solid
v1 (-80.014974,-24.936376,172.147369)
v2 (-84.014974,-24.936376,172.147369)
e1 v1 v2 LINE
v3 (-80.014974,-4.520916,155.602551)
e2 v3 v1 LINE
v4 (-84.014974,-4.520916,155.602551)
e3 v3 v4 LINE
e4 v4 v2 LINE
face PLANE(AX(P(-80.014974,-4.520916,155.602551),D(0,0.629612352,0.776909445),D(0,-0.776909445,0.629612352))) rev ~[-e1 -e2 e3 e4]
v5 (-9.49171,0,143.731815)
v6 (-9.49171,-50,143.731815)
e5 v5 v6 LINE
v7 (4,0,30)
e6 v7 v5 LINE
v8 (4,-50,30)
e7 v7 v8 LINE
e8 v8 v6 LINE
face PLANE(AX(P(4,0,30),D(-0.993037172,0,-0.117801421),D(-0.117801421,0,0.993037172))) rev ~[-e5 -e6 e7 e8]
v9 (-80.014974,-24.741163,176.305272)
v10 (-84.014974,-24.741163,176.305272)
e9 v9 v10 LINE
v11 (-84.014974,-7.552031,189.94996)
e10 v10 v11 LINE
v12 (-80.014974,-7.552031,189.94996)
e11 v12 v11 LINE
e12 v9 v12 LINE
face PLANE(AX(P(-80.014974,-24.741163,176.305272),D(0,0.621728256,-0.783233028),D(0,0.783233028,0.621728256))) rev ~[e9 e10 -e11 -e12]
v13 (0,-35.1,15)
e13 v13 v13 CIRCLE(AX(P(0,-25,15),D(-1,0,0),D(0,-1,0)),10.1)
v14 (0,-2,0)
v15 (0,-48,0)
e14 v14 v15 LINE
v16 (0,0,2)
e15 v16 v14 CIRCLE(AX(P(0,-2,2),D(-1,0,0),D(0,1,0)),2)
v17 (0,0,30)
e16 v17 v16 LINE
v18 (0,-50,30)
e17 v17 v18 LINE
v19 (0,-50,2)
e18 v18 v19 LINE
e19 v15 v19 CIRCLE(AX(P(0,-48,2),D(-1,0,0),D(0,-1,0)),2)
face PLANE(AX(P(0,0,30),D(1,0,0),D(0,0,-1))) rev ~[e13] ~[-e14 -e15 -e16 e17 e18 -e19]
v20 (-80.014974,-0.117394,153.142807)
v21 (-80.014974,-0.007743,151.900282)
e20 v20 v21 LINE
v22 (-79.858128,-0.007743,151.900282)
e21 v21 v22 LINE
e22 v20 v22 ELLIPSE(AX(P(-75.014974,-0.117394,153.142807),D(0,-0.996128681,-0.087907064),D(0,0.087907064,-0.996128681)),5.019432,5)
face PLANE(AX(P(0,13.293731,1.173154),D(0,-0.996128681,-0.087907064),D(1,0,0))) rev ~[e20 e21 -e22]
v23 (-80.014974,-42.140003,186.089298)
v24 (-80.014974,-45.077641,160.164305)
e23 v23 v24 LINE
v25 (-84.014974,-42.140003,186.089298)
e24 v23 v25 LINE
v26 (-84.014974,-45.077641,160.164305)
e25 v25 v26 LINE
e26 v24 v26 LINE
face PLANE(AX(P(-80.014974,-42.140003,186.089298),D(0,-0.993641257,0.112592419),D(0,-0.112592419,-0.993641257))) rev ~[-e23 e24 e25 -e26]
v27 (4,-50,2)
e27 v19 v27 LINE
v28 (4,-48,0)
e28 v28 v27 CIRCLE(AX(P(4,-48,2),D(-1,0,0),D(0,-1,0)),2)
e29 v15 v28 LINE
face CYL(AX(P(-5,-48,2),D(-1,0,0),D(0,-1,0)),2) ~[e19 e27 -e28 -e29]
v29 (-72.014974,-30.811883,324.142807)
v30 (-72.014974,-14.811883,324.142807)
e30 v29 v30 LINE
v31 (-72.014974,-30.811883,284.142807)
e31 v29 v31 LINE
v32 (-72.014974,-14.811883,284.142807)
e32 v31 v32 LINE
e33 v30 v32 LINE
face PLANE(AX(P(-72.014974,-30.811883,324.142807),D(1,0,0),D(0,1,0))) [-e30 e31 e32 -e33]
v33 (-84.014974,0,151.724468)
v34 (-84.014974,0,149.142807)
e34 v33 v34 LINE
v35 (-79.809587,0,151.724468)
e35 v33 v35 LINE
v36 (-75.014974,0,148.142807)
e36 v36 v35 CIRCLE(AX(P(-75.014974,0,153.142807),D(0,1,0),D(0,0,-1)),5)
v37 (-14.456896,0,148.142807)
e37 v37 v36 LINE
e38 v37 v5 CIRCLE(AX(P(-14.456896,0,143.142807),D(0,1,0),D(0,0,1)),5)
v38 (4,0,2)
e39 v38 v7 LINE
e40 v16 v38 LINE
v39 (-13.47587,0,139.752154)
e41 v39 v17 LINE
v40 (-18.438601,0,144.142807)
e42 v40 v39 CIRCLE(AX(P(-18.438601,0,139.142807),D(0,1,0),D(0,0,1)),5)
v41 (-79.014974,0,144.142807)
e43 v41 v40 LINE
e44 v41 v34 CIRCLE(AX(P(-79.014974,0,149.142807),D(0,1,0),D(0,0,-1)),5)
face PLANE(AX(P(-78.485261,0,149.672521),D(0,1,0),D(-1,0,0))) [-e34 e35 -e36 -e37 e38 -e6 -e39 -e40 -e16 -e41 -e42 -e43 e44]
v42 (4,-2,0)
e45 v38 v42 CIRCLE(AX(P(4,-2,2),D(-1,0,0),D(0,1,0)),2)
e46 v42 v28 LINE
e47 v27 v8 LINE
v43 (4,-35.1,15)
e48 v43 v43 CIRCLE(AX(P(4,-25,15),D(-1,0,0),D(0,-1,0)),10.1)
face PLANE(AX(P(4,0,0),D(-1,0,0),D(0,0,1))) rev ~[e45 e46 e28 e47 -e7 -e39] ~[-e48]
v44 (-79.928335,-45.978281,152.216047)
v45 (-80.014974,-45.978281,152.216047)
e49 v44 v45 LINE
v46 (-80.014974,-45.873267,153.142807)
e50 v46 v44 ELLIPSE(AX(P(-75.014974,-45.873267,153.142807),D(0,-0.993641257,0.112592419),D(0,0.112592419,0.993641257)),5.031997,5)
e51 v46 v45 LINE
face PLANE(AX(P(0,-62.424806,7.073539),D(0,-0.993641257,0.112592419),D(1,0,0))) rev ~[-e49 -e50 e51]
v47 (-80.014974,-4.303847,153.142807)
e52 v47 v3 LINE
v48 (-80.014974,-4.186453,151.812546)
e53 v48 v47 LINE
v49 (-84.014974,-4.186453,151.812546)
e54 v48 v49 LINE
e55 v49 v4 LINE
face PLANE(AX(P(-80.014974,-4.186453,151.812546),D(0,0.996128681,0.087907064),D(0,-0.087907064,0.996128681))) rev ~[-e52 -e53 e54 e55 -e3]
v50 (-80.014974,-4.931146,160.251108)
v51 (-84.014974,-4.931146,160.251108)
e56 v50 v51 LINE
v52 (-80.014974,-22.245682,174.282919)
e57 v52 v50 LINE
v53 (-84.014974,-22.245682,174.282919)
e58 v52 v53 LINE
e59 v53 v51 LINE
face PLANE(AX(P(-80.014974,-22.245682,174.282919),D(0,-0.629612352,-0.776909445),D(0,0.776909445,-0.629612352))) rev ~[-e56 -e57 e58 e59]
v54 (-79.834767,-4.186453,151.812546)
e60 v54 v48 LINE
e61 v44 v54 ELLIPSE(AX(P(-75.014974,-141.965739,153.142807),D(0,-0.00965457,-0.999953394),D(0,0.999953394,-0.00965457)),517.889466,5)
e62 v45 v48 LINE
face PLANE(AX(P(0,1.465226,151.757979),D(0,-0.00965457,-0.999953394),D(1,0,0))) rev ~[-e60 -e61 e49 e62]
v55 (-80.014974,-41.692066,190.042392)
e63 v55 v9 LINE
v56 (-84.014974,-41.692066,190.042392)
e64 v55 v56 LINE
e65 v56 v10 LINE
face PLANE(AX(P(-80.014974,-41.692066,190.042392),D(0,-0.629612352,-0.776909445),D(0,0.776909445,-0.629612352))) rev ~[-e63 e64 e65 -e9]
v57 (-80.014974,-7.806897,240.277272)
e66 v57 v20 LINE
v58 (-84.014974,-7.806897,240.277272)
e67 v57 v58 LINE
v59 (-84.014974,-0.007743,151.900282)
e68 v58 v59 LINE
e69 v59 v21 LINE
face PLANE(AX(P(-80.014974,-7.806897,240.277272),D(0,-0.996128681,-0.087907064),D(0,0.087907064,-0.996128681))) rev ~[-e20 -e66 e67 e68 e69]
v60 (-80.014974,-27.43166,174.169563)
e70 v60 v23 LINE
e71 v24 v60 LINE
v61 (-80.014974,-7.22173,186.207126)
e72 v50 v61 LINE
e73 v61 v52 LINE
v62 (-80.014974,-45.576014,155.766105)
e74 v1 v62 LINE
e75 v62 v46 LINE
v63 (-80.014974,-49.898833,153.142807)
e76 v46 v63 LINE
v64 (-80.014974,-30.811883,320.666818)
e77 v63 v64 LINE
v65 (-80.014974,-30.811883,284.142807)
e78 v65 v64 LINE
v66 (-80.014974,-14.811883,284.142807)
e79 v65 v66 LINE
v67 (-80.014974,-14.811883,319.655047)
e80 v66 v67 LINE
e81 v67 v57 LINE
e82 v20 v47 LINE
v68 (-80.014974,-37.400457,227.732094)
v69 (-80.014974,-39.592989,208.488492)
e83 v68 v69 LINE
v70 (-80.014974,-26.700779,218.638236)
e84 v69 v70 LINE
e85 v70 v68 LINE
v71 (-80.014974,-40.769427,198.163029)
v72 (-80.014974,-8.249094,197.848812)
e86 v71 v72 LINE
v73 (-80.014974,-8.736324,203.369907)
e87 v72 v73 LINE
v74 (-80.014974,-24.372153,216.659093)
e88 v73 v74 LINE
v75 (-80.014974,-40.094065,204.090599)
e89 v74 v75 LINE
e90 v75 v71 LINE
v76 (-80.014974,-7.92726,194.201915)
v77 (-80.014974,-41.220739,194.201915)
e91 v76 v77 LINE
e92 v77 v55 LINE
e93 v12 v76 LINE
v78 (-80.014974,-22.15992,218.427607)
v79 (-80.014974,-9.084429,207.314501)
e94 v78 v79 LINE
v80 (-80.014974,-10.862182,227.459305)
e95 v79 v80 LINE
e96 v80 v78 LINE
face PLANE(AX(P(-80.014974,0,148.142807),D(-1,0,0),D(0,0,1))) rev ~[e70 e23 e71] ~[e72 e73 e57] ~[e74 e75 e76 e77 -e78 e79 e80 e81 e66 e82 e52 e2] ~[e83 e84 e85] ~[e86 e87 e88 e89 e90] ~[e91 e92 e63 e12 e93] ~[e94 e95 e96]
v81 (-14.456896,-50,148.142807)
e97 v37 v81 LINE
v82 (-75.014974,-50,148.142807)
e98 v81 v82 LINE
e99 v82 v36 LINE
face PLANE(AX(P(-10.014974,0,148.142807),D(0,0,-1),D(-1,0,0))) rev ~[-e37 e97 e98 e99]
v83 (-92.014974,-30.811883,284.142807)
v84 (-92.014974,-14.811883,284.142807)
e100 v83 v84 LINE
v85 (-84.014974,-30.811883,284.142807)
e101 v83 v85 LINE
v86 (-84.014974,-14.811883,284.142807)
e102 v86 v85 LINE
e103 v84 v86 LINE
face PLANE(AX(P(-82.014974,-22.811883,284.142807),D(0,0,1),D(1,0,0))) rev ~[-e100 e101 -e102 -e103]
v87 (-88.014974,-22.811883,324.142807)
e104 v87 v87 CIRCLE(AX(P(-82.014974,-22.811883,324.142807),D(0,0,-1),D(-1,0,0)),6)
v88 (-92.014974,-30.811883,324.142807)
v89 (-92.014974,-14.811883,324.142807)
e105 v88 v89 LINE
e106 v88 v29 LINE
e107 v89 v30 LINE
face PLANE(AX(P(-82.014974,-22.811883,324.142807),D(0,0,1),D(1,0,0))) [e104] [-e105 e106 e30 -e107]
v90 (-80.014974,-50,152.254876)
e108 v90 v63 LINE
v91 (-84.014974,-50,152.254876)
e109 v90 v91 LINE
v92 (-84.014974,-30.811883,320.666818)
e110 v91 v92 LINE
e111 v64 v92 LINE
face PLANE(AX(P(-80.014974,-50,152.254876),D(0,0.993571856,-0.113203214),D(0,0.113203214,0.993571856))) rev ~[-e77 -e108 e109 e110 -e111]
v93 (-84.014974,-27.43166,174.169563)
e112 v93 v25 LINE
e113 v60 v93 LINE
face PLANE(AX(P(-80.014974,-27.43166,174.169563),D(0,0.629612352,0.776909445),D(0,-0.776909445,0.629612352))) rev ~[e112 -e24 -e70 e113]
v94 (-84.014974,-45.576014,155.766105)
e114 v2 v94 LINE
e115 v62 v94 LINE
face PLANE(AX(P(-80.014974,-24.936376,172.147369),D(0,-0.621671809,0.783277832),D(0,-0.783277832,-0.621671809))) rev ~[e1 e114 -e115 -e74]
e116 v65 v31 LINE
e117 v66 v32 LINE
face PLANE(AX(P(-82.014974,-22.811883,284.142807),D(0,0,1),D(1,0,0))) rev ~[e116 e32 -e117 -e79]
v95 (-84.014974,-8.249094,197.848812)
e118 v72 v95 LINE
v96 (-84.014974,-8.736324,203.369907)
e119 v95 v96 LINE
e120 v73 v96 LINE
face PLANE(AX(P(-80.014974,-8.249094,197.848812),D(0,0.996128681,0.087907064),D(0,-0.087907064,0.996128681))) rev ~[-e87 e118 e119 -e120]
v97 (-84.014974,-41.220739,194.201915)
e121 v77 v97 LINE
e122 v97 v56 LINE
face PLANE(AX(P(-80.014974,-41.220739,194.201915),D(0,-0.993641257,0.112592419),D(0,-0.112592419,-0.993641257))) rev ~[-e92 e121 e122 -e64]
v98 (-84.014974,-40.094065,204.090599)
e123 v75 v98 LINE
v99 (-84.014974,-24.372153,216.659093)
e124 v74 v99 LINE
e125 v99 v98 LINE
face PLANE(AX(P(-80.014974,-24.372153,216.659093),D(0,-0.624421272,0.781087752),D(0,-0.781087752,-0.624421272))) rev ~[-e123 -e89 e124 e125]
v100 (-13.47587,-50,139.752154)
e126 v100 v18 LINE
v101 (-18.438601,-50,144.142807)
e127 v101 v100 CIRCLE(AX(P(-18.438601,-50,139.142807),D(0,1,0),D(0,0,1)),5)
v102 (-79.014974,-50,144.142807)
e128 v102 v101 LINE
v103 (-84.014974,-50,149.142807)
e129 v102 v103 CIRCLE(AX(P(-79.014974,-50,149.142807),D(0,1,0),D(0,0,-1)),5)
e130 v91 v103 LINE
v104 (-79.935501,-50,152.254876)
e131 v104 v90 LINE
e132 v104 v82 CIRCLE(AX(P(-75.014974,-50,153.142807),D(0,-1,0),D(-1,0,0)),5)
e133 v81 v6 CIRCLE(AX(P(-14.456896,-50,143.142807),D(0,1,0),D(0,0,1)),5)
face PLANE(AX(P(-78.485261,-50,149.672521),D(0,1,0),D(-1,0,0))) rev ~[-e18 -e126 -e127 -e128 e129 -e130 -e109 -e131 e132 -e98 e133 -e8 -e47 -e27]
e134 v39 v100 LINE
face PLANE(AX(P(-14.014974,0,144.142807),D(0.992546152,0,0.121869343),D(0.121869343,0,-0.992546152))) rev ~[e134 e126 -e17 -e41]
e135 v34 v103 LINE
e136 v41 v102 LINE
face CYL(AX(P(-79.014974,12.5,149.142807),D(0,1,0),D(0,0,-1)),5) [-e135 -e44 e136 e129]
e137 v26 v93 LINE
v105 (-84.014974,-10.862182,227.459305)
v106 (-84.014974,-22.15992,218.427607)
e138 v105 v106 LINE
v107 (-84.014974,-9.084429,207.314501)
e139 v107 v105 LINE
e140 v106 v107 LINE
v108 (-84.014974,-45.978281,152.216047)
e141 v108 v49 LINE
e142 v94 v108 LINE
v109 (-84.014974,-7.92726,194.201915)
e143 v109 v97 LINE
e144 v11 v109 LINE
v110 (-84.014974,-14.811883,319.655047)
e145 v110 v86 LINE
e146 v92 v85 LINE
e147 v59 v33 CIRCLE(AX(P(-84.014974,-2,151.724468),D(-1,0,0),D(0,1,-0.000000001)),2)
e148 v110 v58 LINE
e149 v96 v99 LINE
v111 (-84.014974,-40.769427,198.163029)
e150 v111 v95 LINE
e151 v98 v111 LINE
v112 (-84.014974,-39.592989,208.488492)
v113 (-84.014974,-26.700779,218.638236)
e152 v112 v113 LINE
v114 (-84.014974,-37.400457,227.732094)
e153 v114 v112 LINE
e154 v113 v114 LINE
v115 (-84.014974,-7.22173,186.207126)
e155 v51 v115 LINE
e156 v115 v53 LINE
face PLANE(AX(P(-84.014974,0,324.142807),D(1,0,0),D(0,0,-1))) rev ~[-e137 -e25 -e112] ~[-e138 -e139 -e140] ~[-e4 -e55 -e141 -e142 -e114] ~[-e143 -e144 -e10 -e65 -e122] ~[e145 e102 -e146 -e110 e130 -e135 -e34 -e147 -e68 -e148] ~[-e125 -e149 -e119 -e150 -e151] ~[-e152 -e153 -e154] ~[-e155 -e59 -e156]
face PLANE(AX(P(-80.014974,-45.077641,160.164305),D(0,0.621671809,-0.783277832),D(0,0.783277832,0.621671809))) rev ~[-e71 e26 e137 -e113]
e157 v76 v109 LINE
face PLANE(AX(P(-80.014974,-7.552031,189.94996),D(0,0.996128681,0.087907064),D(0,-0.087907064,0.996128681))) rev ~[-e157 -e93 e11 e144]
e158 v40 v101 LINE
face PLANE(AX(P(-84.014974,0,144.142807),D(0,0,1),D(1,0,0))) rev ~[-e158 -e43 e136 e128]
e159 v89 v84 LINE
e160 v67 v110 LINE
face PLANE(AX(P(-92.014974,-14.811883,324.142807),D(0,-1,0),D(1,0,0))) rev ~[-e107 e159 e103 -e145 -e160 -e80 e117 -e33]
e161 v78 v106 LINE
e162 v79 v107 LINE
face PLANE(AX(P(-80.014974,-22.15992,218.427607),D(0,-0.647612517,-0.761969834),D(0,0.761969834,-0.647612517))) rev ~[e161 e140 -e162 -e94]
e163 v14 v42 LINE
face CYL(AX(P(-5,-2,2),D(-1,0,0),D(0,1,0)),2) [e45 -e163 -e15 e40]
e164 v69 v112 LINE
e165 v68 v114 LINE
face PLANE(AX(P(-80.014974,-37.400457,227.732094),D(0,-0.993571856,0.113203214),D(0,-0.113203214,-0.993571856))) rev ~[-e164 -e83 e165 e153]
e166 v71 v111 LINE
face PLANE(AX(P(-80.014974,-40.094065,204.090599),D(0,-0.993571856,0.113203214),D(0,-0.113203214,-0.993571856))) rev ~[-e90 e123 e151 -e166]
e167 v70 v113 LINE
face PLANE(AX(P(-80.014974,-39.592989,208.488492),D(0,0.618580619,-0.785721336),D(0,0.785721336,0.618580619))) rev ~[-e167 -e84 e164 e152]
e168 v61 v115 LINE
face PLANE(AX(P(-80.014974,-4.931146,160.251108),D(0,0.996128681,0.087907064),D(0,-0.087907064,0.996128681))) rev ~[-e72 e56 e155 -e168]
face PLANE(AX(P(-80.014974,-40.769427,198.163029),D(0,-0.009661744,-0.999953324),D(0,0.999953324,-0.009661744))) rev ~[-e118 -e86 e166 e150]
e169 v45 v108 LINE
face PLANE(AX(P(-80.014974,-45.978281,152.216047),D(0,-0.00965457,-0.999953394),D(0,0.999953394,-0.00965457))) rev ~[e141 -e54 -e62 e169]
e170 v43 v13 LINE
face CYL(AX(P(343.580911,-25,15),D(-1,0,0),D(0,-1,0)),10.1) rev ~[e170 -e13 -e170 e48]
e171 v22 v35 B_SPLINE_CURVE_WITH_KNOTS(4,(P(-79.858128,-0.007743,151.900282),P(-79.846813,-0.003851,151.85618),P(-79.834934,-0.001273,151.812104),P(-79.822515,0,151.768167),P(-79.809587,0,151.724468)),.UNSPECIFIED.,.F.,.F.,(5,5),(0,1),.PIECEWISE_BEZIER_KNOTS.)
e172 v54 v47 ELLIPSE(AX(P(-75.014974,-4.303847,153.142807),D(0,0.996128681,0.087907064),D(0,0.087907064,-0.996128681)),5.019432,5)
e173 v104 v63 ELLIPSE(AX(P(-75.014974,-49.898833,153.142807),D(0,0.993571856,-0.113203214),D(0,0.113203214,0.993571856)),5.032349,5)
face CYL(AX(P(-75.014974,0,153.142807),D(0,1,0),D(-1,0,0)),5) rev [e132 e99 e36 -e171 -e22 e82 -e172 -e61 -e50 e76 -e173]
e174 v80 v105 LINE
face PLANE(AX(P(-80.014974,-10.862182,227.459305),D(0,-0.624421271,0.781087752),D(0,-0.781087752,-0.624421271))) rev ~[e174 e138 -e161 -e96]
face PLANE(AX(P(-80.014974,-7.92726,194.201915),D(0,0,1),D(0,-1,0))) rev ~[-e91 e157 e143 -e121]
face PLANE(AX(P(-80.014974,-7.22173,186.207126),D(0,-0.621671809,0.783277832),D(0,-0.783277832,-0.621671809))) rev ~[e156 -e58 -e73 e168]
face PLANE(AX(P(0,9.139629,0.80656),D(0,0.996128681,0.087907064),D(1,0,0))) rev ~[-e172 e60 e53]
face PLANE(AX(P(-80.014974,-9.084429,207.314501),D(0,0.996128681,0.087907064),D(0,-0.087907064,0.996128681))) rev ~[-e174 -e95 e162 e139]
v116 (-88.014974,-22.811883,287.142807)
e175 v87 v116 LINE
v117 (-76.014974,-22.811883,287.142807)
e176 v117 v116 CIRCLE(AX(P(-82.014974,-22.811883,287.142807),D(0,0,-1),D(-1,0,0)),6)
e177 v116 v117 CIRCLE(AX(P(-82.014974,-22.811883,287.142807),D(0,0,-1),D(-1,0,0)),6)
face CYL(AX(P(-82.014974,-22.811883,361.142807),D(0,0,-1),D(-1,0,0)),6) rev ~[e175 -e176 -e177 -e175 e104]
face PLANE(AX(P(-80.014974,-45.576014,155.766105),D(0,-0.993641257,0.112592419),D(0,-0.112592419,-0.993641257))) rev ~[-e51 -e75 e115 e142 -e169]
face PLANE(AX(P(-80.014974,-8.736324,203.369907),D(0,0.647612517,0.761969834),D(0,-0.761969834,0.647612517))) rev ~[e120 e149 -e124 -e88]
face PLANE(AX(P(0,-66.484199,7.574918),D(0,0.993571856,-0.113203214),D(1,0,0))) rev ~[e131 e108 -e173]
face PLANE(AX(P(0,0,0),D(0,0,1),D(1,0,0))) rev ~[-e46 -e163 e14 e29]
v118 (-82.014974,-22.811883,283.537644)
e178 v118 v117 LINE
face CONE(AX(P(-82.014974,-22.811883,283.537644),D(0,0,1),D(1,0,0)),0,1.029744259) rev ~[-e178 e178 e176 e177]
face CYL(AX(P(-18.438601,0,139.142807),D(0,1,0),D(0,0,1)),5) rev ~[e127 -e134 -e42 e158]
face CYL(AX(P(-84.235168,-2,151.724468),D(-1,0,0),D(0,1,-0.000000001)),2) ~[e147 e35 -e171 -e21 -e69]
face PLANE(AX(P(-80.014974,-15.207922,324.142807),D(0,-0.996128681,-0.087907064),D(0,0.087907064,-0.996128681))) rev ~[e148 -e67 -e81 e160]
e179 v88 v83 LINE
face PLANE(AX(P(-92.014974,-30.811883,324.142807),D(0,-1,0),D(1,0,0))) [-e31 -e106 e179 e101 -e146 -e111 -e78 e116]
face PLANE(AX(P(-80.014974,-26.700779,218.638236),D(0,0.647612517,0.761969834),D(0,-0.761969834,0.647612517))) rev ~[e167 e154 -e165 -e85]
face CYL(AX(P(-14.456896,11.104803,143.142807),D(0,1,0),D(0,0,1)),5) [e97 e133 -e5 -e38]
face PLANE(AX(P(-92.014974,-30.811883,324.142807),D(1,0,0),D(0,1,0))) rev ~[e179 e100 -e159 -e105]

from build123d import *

# Parameters (mm, degrees)
F1_DEPTH     = 50
F3_D         = 20.2
F5_DEPTH     = 25
F6_T1_DEPTH  = 50
F6_T6_DEPTH  = 50
F6_T13_DEPTH = 50
F6_T19_DEPTH = 50
F6_T26_DEPTH = 50
F6_T33_DEPTH = 50
F6_T36_DEPTH = 72.2096061325
F6_T38_DEPTH = 75
F7_T1_DEPTH  = 4.6205948456
F7_T3_DEPTH  = 14
F8_W         = 20
F8_H         = 16
F8_W_2       = 4
F8_H_2       = 15.2079220091
F9_DEPTH     = 40
F10_D        = 12
F10_DEPTH    = 37
F10_TIP      = 3.6051637142


# Not quite as in the source:
# - a fillet or chamfer that OpenCascade refuses, or shapes differently, is made with other operations: its cross-section is extruded or revolved along the edge and cut away or added
# - a feature names something its author has since deleted; it is built from what else it names


with BuildPart() as f1:
    # F0 (on Front) → F1 (new body)
    with BuildSketch(Plane.XZ):
        Polygon((0, 30), (0, 0), (4, 0), (4, 30), (-10.0149744916, 148.1428074388), (-14.0149744916, 148.1428074388), (-80.0149744916, 148.1428074388), (-80.0149744916, 324.1428074388), (-84.0149744916, 324.1428074388), (-84.0149744916, 144.1428074388), (-14.0149744916, 144.1428074388), align=None)
    extrude(amount=F1_DEPTH)

    # F3 (through all)
    with Locations(Plane.YZ.offset(4)):
        with Locations((-25, 15)):
            Hole(F3_D / 2)

    # F4 (on face) → F5 (cut)
    with BuildSketch(Plane.YZ.offset(-80.0149744916)):
        Polygon((-50, 324.1428074388), (-50, 236.1428074388), (-50, 199.9447409799), (-50, 195.9447409799), (-50, 194.2019151126), (-50, 156.2548764067), (-50, 152.2548764067), (-39.9857666554, 240.1486744376), (-30.4158440182, 324.1428074388), align=None)
        Polygon((0, 324.1428074388), (-15.2079220091, 324.1428074388), (-7.806897337, 240.2772722232), (0, 151.8125457081), (0, 244.1428074388), align=None)
        Polygon((-45.5760135212, 155.7661052017), (-45.9782811199, 152.2160466314), (-4.1864533227, 151.8125457081), (-4.5209163536, 155.6025507861), (-24.936375975, 172.1473690272), align=None)
        Polygon((-9.0844288508, 207.3145008204), (-10.8621816933, 227.4593051175), (-22.1599204596, 218.427607474), align=None)
        Polygon((-42.1400031958, 186.0892978758), (-45.0776405527, 160.1643048917), (-27.431660318, 174.1695633191), align=None)
        Polygon((-39.5929888388, 208.4884916623), (-26.7007793174, 218.6382363502), (-37.4004572752, 227.7320942228), align=None)
        Polygon((-22.2456820263, 174.2829185178), (-4.9311455022, 160.2511080648), (-7.2217303873, 186.2071257598), align=None)
        Polygon((-8.7363235607, 203.3699069618), (-24.3721529686, 216.6590929463), (-40.0940653957, 204.0905991656), (-40.7694266569, 198.1630294508), (-8.2490940623, 197.8488116452), align=None)
        Polygon((-41.6920664445, 190.0423920546), (-24.7411634004, 176.305272485), (-7.5520306119, 189.9499595352), (-7.9272601749, 194.2019151126), (-41.2207386286, 194.2019151126), align=None)
    extrude(amount=-F5_DEPTH, mode=Mode.SUBTRACT)

    # F6: fillet of radius 5 on 4 edges, made by hand

    # F6_s2 → F6_t1 (join)
    with BuildSketch(Plane.XZ):
        with BuildLine():
            ThreePointArc((-18.4386008144, 144.1428074388), (-15.1255005733, 142.8875860427), (-13.4758700562, 139.7521541558))
            Line((-13.4758700562, 139.7521541558), (-14.0149744916, 144.1428074388))
            Line((-14.0149744916, 144.1428074388), (-18.4386008144, 144.1428074388))
        make_face()
    extrude(amount=F6_T1_DEPTH)


with BuildPart() as f6_tool4:
    # F6_s5 → F6_t6 (new body)
    with BuildSketch(Plane.XZ):
        with BuildLine():
            ThreePointArc((-80.0149744916, 153.1428074388), (-78.5505083975, 149.6072735328), (-75.0149744916, 148.1428074388))
            Line((-75.0149744916, 148.1428074388), (-80.0149744916, 148.1428074388))
            Line((-80.0149744916, 148.1428074388), (-80.0149744916, 153.1428074388))
        make_face()
    extrude(amount=F6_T6_DEPTH)

    split(bisect_by=Plane(origin=(0, 13.2937308283, 1.1731544977), x_dir=(1, 0, 0), z_dir=(0, -0.9961286805, -0.0879070636)), keep=Keep.TOP)

    split(bisect_by=Plane(origin=(0, 1.465226283, 151.7579786298), x_dir=(1, 0, 0), z_dir=(0, 0.0096545698, 0.9999533936)), keep=Keep.TOP)

    split(bisect_by=Plane(origin=(0, 9.1396289593, 0.8065603975), x_dir=(1, 0, 0), z_dir=(0, 0.9961286805, 0.0879070636)), keep=Keep.TOP)


with BuildPart() as f1_1:
    add(f1.part)

    # F6_t3: union F6_tool4
    add(f6_tool4.part)


with BuildPart() as f6_tool11:
    # F6_s12 → F6_t13 (new body)
    with BuildSketch(Plane.XZ):
        with BuildLine():
            ThreePointArc((-80.0149744916, 153.1428074388), (-78.5505083975, 149.6072735328), (-75.0149744916, 148.1428074388))
            Line((-75.0149744916, 148.1428074388), (-80.0149744916, 148.1428074388))
            Line((-80.0149744916, 148.1428074388), (-80.0149744916, 153.1428074388))
        make_face()
    extrude(amount=F6_T13_DEPTH)

    split(bisect_by=Plane(origin=(0, 1.465226283, 151.7579786298), x_dir=(1, 0, 0), z_dir=(0, -0.0096545698, -0.9999533936)), keep=Keep.TOP)

    split(bisect_by=Plane(origin=(0, 9.1396289593, 0.8065603975), x_dir=(1, 0, 0), z_dir=(0, 0.9961286805, 0.0879070636)), keep=Keep.TOP)


with BuildPart() as f1_2:
    add(f1_1.part)

    # F6_t10: union F6_tool11
    add(f6_tool11.part)


with BuildPart() as f6_tool17:
    # F6_s18 → F6_t19 (new body)
    with BuildSketch(Plane.XZ):
        with BuildLine():
            ThreePointArc((-80.0149744916, 153.1428074388), (-78.5505083975, 149.6072735328), (-75.0149744916, 148.1428074388))
            Line((-75.0149744916, 148.1428074388), (-80.0149744916, 148.1428074388))
            Line((-80.0149744916, 148.1428074388), (-80.0149744916, 153.1428074388))
        make_face()
    extrude(amount=F6_T19_DEPTH)

    split(bisect_by=Plane(origin=(0, -62.4248064238, 7.0735387838), x_dir=(1, 0, 0), z_dir=(0, 0.9936412568, -0.1125924191)), keep=Keep.TOP)

    split(bisect_by=Plane(origin=(0, 1.465226283, 151.7579786298), x_dir=(1, 0, 0), z_dir=(0, -0.0096545698, -0.9999533936)), keep=Keep.TOP)

    split(bisect_by=Plane(origin=(0, 9.1396289593, 0.8065603975), x_dir=(1, 0, 0), z_dir=(0, -0.9961286805, -0.0879070636)), keep=Keep.TOP)


with BuildPart() as f1_3:
    add(f1_2.part)

    # F6_t16: union F6_tool17
    add(f6_tool17.part)


with BuildPart() as f6_tool24:
    # F6_s25 → F6_t26 (new body)
    with BuildSketch(Plane.XZ):
        with BuildLine():
            ThreePointArc((-80.0149744916, 153.1428074388), (-78.5505083975, 149.6072735328), (-75.0149744916, 148.1428074388))
            Line((-75.0149744916, 148.1428074388), (-80.0149744916, 148.1428074388))
            Line((-80.0149744916, 148.1428074388), (-80.0149744916, 153.1428074388))
        make_face()
    extrude(amount=F6_T26_DEPTH)

    split(bisect_by=Plane(origin=(0, -66.484199108, 7.5749176678), x_dir=(1, 0, 0), z_dir=(0, 0.9935718557, -0.1132032138)), keep=Keep.TOP)

    split(bisect_by=Plane(origin=(0, -62.4248064238, 7.0735387838), x_dir=(1, 0, 0), z_dir=(0, -0.9936412568, 0.1125924191)), keep=Keep.TOP)

    split(bisect_by=Plane(origin=(0, 1.465226283, 151.7579786298), x_dir=(1, 0, 0), z_dir=(0, 0.0096545698, 0.9999533936)), keep=Keep.TOP)


with BuildPart() as f1_4:
    add(f1_3.part)

    # F6_t23: union F6_tool24
    add(f6_tool24.part)


with BuildPart() as f6_tool31:
    # F6_s32 → F6_t33 (new body)
    with BuildSketch(Plane.XZ):
        with BuildLine():
            ThreePointArc((-80.0149744916, 153.1428074388), (-78.5505083975, 149.6072735328), (-75.0149744916, 148.1428074388))
            Line((-75.0149744916, 148.1428074388), (-80.0149744916, 148.1428074388))
            Line((-80.0149744916, 148.1428074388), (-80.0149744916, 153.1428074388))
        make_face()
    extrude(amount=F6_T33_DEPTH)

    split(bisect_by=Plane(origin=(0, -62.4248064238, 7.0735387838), x_dir=(1, 0, 0), z_dir=(0, -0.9936412568, 0.1125924191)), keep=Keep.TOP)

    split(bisect_by=Plane(origin=(0, 1.465226283, 151.7579786298), x_dir=(1, 0, 0), z_dir=(0, -0.0096545698, -0.9999533936)), keep=Keep.TOP)


with BuildPart() as f1_5:
    add(f1_4.part)

    # F6_t30: union F6_tool31
    add(f6_tool31.part)

    # F6_s37 → F6_t36 (cut)
    with BuildSketch(Plane.XZ.offset(-11.1048030662)):
        with BuildLine():
            ThreePointArc((-14.4568957181, 148.1428074388), (-11.1361304097, 146.8807905536), (-9.4917098577, 143.7318145454))
            Line((-9.4917098577, 143.7318145454), (-10.0149744916, 148.1428074388))
            Line((-10.0149744916, 148.1428074388), (-14.4568957181, 148.1428074388))
        make_face()
    extrude(amount=F6_T36_DEPTH, mode=Mode.SUBTRACT)

    # F6_s39 → F6_t38 (cut)
    with BuildSketch(Plane.XZ.offset(-12.5)):
        with BuildLine():
            ThreePointArc((-79.0149744916, 144.1428074388), (-82.5505083975, 145.6072735328), (-84.0149744916, 149.1428074388))
            Line((-84.0149744916, 149.1428074388), (-84.0149744916, 144.1428074388))
            Line((-84.0149744916, 144.1428074388), (-79.0149744916, 144.1428074388))
        make_face()
    extrude(amount=F6_T38_DEPTH, mode=Mode.SUBTRACT)

    # F7: fillet of radius 2 on 3 edges, made by hand

    # F7_s2 → F7_t1 (cut)
    with BuildSketch(Plane.YZ.offset(-84.2351683711)):
        with BuildLine():
            ThreePointArc((0, 151.7244681563), (-0.0019365973, 151.8124604227), (-0.007742639, 151.9002822835))
            Line((-0.007742639, 151.9002822835), (0, 151.8125457081))
            Line((0, 151.8125457081), (0, 151.7244681563))
        make_face()
    extrude(amount=F7_T1_DEPTH, mode=Mode.SUBTRACT)

    # F7_s4 → F7_t3 (cut)
    with BuildSketch(Plane.YZ.offset(-5)):
        with BuildLine():
            ThreePointArc((-50, 2), (-49.4142135624, 0.5857864376), (-48, 0))
            Line((-48, 0), (-50, 0))
            Line((-50, 0), (-50, 2))
        make_face()
        with BuildLine():
            ThreePointArc((0, 2), (-0.5857864376, 0.5857864376), (-2, 0))
            Line((-2, 0), (0, 0))
            Line((0, 0), (0, 2))
        make_face()
    extrude(amount=F7_T3_DEPTH, mode=Mode.SUBTRACT)

    # F8 (on face) → F9 (join)
    with BuildSketch(Plane.XY.offset(324.1428074388)):
        with Locations((-82.0149744916, -22.8118830136)):
            Rectangle(F8_W, F8_H)
        with Locations((-82.0149744916, -22.8118830136)):
            Rectangle(F8_W_2, F8_H_2, mode=Mode.SUBTRACT)
    extrude(amount=-F9_DEPTH)

    # F10
    with Locations(Plane.XY.offset(324.1428074388)):
        with Locations((-82.0149744916, -22.8118830136)):
            Hole(F10_D / 2, depth=F10_DEPTH)
            with Locations((0, 0, -(F10_DEPTH + F10_TIP / 2))):  # 118° drill point
                Cone(0, F10_D / 2, F10_TIP, mode=Mode.SUBTRACT)


solid = f1_5.part
